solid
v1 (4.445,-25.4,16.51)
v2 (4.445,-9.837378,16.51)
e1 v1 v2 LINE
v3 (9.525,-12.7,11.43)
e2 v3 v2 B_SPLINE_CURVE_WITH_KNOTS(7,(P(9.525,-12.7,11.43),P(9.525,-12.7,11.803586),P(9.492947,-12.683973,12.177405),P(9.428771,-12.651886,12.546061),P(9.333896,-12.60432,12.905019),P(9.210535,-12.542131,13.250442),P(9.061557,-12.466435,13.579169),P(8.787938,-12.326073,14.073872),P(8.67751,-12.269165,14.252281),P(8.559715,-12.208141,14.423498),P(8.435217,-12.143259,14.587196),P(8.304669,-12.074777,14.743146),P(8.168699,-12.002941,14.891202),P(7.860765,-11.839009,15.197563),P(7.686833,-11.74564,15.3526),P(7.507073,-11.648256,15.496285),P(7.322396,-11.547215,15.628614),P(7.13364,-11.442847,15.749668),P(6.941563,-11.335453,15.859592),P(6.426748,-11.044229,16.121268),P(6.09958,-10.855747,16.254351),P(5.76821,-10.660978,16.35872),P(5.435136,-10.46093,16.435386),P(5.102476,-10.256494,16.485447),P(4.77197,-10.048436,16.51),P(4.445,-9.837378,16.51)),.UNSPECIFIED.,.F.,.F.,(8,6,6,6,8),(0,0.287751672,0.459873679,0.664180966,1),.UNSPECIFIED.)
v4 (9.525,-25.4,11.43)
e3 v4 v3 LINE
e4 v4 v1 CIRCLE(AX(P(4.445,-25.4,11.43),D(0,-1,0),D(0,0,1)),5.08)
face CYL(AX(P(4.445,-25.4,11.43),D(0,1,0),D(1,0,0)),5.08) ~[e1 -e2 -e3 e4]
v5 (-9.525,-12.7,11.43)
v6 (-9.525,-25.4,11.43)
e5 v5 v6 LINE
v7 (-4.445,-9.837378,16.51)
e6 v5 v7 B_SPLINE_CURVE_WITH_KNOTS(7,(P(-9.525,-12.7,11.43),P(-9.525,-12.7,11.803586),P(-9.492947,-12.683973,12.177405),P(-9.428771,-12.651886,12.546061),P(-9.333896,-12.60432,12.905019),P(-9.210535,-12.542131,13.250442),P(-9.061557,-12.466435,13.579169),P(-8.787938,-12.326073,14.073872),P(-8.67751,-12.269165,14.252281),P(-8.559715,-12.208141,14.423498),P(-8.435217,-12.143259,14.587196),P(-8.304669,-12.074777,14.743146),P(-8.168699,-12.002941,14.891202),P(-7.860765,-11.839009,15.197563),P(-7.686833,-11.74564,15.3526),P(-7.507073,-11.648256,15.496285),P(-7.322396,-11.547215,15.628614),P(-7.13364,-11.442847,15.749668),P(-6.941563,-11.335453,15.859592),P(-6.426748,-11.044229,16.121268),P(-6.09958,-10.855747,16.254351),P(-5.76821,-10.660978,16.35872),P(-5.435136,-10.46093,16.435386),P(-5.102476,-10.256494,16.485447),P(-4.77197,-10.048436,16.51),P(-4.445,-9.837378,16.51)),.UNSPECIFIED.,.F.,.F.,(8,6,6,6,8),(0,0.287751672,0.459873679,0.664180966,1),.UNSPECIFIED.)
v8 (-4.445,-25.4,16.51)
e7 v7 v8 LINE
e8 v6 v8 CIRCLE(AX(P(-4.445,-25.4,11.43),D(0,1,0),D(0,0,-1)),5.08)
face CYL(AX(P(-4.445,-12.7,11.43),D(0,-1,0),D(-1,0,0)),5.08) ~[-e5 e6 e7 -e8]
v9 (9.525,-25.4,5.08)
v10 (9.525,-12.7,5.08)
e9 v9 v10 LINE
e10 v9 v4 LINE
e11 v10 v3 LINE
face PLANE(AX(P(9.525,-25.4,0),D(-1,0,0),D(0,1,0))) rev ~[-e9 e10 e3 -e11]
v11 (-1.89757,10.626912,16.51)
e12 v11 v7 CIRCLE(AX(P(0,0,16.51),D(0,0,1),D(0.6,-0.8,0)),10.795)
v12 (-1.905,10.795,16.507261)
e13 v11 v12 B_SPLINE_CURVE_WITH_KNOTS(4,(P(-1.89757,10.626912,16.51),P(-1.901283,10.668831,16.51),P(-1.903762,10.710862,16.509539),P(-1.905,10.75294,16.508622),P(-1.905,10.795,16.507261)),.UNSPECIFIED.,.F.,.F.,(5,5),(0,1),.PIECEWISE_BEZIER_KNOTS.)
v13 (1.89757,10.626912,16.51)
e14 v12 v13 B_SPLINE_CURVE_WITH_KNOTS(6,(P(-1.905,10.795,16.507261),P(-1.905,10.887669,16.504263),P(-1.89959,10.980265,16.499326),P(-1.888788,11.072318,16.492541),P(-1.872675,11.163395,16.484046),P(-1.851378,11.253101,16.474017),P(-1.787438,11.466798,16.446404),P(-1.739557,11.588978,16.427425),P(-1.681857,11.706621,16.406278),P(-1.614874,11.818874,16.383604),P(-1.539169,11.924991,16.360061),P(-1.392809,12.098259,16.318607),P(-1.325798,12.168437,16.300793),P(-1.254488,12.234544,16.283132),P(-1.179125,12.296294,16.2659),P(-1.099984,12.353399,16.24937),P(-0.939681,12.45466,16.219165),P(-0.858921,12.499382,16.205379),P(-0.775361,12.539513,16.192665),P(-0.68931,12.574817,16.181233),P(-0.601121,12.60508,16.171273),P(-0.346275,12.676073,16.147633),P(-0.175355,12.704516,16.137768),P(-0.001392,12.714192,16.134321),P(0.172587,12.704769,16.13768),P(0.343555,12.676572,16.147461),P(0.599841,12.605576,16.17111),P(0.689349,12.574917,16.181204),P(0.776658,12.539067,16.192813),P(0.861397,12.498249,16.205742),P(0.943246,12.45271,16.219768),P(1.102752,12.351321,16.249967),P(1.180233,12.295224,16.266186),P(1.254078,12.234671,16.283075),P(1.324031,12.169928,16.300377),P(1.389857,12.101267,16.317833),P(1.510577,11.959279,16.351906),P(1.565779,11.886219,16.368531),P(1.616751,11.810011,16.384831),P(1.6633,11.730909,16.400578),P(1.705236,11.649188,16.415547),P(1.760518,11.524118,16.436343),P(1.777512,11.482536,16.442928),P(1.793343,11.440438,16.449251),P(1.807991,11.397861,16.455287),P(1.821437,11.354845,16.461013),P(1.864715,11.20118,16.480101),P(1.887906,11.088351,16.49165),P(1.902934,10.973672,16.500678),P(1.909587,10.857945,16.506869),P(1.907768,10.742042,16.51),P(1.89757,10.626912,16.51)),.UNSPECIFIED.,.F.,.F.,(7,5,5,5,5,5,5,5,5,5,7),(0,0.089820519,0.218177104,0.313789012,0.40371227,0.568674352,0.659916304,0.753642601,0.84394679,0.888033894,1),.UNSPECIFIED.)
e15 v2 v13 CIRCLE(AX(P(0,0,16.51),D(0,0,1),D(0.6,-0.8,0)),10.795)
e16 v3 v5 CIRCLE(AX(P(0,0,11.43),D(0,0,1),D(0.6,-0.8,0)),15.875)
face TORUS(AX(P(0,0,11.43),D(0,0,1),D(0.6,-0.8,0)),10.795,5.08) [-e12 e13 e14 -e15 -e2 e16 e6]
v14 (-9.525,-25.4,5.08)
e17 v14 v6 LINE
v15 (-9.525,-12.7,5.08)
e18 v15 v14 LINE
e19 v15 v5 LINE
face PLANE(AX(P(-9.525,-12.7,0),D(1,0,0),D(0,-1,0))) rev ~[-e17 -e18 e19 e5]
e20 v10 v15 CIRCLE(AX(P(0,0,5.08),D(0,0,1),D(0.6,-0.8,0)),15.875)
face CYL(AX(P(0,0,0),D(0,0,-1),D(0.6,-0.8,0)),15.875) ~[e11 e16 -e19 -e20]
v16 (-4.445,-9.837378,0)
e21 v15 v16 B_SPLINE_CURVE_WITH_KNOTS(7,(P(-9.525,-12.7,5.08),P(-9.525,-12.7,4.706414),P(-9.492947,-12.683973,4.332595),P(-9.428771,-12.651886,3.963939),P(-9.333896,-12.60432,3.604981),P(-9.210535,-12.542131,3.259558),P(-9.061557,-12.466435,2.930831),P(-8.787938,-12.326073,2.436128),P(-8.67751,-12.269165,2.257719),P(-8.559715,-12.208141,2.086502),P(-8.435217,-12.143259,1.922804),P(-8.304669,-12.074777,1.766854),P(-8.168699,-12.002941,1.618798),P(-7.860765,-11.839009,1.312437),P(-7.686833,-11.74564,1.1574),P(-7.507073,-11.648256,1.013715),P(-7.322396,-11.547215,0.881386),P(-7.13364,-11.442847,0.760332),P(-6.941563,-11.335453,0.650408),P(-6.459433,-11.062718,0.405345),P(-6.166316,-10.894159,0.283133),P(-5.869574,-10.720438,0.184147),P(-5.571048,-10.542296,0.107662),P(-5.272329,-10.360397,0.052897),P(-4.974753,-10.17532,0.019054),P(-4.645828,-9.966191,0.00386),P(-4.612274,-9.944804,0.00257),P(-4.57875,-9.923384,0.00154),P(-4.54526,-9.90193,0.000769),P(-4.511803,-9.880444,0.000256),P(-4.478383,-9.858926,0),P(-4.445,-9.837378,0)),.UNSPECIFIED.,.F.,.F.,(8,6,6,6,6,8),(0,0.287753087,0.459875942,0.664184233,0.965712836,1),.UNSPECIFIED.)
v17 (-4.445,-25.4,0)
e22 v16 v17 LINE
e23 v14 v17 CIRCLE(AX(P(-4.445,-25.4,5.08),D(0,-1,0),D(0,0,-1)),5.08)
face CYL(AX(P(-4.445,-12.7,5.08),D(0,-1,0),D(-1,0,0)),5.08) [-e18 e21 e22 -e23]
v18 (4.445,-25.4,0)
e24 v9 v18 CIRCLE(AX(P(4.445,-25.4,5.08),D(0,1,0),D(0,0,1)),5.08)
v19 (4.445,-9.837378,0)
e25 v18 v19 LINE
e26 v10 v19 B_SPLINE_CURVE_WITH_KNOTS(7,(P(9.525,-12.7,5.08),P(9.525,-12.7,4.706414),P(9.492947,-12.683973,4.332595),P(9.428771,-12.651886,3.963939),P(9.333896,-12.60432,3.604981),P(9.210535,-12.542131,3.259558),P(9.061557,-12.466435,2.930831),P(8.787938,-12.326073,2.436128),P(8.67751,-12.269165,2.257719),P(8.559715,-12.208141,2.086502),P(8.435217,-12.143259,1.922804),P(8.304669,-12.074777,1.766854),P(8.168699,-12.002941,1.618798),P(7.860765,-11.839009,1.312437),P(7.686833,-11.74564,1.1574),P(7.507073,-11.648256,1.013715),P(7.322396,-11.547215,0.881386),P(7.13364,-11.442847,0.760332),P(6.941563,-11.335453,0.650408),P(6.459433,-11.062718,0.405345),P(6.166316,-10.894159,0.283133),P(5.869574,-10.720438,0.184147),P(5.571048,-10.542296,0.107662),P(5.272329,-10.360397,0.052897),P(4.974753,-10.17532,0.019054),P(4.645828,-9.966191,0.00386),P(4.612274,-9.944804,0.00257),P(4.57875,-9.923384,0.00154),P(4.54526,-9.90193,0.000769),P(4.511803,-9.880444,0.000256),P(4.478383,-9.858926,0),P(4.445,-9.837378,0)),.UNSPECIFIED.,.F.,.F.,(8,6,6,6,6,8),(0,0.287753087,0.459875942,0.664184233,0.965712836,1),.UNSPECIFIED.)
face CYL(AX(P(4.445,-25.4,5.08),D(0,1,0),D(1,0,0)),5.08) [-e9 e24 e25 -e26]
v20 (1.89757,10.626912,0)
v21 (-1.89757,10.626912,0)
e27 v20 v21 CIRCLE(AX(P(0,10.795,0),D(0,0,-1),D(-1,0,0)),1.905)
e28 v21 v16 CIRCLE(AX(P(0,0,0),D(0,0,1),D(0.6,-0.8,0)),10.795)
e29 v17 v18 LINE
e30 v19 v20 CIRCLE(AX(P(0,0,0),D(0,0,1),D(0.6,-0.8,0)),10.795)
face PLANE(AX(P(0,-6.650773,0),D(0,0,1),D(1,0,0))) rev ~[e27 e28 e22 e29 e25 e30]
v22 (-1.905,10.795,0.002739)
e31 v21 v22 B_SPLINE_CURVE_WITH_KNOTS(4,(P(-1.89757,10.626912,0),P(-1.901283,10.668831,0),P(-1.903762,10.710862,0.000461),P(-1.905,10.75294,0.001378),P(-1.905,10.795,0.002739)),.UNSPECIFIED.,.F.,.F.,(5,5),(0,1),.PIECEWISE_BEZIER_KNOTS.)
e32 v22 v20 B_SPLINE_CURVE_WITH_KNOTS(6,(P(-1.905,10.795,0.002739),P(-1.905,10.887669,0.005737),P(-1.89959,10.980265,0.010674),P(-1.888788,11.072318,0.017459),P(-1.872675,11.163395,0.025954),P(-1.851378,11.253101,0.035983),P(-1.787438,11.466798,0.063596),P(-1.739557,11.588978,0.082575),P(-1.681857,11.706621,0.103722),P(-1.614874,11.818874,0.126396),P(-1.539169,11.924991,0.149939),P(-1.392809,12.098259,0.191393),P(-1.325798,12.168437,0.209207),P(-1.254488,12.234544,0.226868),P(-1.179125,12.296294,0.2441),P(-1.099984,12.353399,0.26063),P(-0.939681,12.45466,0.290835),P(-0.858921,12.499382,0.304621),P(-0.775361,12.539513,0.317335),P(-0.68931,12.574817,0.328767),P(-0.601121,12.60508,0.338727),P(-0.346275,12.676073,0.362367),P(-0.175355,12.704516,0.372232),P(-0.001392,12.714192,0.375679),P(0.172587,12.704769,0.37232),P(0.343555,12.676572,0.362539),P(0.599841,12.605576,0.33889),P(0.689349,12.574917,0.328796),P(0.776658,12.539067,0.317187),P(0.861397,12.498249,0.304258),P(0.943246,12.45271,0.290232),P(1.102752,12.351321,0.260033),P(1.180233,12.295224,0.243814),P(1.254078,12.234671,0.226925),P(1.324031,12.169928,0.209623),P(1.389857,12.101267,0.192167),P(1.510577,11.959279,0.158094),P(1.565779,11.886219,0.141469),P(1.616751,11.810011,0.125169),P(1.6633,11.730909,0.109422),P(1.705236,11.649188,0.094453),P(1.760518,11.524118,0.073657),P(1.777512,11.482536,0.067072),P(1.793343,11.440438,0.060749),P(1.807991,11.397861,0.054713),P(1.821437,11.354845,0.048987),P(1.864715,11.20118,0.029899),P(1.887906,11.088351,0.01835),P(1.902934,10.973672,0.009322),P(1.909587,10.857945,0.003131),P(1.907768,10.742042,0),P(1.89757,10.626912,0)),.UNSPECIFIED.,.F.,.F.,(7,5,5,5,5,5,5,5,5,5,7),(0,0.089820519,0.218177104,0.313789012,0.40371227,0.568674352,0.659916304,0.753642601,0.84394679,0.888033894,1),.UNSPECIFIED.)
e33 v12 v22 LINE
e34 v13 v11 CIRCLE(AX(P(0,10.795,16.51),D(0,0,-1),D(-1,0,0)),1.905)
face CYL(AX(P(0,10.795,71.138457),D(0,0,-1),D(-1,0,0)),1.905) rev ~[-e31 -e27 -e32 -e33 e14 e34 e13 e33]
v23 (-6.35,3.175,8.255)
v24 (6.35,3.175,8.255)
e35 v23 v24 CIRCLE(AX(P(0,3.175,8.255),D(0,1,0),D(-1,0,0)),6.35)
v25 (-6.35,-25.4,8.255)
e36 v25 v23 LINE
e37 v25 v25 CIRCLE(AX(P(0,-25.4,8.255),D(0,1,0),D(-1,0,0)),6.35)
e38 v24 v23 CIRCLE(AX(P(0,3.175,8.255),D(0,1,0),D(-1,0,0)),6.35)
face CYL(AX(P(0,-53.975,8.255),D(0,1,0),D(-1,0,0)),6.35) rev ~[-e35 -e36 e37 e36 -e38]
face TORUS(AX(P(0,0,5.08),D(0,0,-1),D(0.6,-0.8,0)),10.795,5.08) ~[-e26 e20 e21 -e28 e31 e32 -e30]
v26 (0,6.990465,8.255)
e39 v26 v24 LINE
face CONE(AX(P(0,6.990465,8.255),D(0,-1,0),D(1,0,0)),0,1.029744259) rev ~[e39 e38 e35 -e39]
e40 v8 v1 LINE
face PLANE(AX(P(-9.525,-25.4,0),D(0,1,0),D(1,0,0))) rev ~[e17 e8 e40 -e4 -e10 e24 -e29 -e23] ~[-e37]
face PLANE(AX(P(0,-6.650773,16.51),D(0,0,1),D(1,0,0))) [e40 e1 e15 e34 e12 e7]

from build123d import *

# Parameters (mm, degrees)
F1_DEPTH = 16.51
F2_R     = 5.08
F4_D     = 3.81
F6_D     = 12.7
F6_DEPTH = 28.575
F6_TIP   = 3.8154649308


with BuildPart() as f1:
    # F0 (on Top) → F1 (new body)
    with BuildSketch(Plane.XY):
        with BuildLine():
            Line((9.525, -25.4), (9.525, -12.7))
            ThreePointArc((9.525, -12.7), (0, 15.875), (-9.525, -12.7))
            Line((-9.525, -12.7), (-9.525, -25.4))
            Line((-9.525, -25.4), (9.525, -25.4))
        make_face()
    extrude(amount=F1_DEPTH)

    # F2
    f2_edges = [f1.edges().sort_by_distance(p)[0] for p in [
        (0, 15.875, 16.51),
        (-9.525, -19.05, 16.51),
        (9.525, -19.05, 16.51),
        (0, 15.875, 0),
        (-9.525, -19.05, 0),
        (9.525, -19.05, 0),
    ]]
    fillet(f2_edges, radius=F2_R)

    # F4 (through all)
    with Locations(Plane.XY.offset(16.51)):
        with Locations((0, 10.795)):
            Hole(F4_D / 2)

    # F6
    with Locations(Plane.XZ.offset(25.4)):
        with Locations((0, 8.255)):
            Hole(F6_D / 2, depth=F6_DEPTH)
            with Locations((0, 0, -(F6_DEPTH + F6_TIP / 2))):  # 118° drill point
                Cone(0, F6_D / 2, F6_TIP, mode=Mode.SUBTRACT)


solid = f1.part
